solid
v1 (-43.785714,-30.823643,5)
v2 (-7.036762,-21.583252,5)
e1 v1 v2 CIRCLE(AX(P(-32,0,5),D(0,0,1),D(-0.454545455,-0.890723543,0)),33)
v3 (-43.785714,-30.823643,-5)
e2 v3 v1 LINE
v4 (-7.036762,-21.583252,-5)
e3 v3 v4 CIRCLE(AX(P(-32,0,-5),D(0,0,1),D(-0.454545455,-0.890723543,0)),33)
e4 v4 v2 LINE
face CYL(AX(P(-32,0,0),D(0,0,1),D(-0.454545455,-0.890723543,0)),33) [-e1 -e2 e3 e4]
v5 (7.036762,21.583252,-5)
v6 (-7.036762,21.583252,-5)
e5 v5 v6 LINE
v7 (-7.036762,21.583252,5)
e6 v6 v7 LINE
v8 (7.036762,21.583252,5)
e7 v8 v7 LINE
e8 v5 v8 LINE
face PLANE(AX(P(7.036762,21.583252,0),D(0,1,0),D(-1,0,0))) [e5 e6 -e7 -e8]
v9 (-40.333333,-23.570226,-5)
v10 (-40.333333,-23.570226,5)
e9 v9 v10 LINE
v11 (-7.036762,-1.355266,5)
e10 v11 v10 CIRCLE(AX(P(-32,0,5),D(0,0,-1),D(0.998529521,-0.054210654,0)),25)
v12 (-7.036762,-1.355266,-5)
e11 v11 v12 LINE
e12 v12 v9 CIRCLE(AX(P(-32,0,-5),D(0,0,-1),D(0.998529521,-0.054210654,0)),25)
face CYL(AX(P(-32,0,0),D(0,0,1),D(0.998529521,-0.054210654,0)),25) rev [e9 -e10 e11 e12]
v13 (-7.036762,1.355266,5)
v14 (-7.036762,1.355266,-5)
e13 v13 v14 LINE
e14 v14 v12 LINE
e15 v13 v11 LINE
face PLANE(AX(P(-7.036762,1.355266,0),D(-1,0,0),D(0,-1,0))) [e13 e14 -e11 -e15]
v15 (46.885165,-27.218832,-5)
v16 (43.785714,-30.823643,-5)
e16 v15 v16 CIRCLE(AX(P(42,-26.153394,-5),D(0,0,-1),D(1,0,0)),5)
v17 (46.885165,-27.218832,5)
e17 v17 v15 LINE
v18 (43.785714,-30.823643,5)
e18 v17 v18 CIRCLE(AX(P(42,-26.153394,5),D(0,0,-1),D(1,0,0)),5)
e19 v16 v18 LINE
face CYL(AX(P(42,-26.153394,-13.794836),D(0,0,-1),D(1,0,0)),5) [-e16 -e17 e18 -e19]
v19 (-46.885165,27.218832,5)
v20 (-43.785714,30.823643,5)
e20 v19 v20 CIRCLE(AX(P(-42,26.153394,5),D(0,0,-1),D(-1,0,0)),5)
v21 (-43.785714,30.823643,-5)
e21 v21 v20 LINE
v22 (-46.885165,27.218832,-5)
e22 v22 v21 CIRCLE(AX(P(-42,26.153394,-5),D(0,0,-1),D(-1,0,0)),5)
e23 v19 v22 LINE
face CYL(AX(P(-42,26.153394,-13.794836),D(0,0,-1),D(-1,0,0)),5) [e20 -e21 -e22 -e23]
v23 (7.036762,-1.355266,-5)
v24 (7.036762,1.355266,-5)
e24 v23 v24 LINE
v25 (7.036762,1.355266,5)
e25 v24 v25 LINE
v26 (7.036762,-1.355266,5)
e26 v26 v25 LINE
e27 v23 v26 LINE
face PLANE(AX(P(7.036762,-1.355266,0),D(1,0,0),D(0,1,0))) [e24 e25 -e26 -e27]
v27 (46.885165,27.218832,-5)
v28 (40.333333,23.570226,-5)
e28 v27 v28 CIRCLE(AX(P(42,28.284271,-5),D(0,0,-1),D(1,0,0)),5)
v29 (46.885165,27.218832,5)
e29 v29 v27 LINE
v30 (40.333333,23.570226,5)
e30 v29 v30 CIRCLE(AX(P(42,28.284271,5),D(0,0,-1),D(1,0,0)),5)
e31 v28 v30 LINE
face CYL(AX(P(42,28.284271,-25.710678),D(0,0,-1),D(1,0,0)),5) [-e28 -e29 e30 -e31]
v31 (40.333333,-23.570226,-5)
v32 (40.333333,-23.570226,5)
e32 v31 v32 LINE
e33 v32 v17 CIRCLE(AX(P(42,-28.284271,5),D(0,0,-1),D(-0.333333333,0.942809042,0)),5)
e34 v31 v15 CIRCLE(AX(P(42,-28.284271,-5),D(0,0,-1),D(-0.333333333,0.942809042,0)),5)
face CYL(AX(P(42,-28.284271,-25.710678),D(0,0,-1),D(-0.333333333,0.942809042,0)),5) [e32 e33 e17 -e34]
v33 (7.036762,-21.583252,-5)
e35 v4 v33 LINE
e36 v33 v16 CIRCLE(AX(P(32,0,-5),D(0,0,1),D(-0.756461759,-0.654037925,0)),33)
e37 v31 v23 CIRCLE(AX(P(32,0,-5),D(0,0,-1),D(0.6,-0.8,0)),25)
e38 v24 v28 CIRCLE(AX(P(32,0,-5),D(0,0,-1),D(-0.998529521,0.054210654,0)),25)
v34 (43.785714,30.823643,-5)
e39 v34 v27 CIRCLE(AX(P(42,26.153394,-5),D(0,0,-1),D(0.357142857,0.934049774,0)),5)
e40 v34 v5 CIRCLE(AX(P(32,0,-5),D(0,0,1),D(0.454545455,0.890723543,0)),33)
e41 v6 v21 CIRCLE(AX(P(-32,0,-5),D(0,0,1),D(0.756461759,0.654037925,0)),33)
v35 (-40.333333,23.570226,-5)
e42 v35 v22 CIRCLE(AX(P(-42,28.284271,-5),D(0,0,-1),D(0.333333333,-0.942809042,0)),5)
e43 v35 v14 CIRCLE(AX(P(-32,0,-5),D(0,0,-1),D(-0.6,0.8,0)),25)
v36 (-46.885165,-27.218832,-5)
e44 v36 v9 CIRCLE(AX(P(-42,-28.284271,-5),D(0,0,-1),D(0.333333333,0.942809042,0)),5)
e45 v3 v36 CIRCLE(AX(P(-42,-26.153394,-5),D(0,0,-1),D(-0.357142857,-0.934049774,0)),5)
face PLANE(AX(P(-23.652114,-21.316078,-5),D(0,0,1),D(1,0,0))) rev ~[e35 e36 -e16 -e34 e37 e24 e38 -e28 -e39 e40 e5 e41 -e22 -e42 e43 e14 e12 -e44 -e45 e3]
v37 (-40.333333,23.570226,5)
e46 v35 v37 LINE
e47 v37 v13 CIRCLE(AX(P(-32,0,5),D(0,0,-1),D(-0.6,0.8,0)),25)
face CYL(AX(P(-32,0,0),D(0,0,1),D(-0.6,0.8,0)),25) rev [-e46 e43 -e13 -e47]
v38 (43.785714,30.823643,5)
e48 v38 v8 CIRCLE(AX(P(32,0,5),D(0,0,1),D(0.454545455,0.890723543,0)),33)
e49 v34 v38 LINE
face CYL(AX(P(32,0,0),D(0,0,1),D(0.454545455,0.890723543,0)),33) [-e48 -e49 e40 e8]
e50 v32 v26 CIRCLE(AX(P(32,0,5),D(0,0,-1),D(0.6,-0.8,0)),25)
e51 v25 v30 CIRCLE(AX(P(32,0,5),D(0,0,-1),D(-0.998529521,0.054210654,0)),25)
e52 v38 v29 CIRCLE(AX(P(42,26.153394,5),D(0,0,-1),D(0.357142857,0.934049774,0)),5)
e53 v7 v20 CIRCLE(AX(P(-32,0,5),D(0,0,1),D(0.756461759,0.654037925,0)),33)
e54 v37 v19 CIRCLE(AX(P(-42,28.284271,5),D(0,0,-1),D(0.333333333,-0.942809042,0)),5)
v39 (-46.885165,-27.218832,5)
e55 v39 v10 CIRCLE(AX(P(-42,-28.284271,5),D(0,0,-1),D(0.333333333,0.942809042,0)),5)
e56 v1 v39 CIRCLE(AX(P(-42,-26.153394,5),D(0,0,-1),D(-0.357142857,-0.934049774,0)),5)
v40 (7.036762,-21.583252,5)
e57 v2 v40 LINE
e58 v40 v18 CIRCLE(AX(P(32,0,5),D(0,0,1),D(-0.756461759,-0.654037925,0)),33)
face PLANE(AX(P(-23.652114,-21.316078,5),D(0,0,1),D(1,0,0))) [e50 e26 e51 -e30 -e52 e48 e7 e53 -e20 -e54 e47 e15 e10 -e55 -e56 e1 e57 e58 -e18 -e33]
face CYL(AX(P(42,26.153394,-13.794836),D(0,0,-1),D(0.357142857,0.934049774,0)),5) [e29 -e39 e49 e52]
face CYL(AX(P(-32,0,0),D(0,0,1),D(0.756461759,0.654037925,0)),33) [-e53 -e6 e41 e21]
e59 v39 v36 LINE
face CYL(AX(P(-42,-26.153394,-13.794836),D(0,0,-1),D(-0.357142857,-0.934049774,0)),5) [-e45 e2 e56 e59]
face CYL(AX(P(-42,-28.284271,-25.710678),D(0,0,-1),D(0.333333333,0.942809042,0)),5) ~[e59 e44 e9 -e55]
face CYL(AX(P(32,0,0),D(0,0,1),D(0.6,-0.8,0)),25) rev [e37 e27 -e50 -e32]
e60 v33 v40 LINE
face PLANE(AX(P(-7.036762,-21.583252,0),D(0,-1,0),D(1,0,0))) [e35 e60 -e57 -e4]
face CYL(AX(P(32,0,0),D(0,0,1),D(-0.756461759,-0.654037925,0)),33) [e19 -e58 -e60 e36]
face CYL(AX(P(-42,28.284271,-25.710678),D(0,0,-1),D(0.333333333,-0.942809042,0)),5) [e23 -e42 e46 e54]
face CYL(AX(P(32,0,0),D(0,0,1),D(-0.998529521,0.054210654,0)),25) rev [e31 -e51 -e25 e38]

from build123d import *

# Parameters (mm, degrees)
F1_DEPTH      = 5
F1_DEPTH_BACK = 5
F2_T1_DEPTH   = 51.4213562373
F2_T3_DEPTH   = 27.589671948


# Not quite as in the source:
# - a fillet or chamfer that OpenCascade refuses, or shapes differently, is made with other operations: its cross-section is extruded or revolved along the edge and cut away or added


with BuildPart() as f1:
    # F0 (on Top) → F1 (new body, two sides)
    with BuildSketch(Plane.XY) as f1_sk:
        with BuildLine():
            ThreePointArc((-7.0367619663, -1.3552663468), (-21.4300874517, -22.6556162733), (-47, -20))
            Line((-47, -20), (-47, -29.3938769134))
            ThreePointArc((-47, -29.3938769134), (-25.6700714676, -32.3872197753), (-7.0367619663, -21.5832515361))
            Line((-7.0367619663, -21.5832515361), (-7.0367619663, -1.3552663468))
        make_face()
        with BuildLine():
            Line((-7.0367619663, 1.3552663468), (-7.0367619663, -1.3552663468))
            ThreePointArc((-7.0367619663, -1.3552663468), (-7, 0), (-7.0367619663, 1.3552663468))
        make_face()
        with BuildLine():
            ThreePointArc((-7.0367619663, 1.3552663468), (-7, 0), (-7.0367619663, -1.3552663468))
            Line((-7.0367619663, -1.3552663468), (-7.0367619663, -21.5832515361))
            ThreePointArc((-7.0367619663, -21.5832515361), (-2.7270271398, -15.2346007472), (0, -8.0622577483))
            ThreePointArc((0, -8.0622577483), (-1, 0), (0, 8.0622577483))
            ThreePointArc((0, 8.0622577483), (-2.7270271398, 15.2346007472), (-7.0367619663, 21.5832515361))
            Line((-7.0367619663, 21.5832515361), (-7.0367619663, 1.3552663468))
        make_face()
        with BuildLine():
            ThreePointArc((-47, 20), (-21.4300874517, 22.6556162733), (-7.0367619663, 1.3552663468))
            Line((-7.0367619663, 1.3552663468), (-7.0367619663, 21.5832515361))
            ThreePointArc((-7.0367619663, 21.5832515361), (-25.6700714676, 32.3872197753), (-47, 29.3938769134))
            Line((-47, 29.3938769134), (-47, 20))
        make_face()
        with BuildLine():
            ThreePointArc((0, -8.0622577483), (-2.7270271398, -15.2346007472), (-7.0367619663, -21.5832515361))
            Line((-7.0367619663, -21.5832515361), (7.0367619663, -21.5832515361))
            ThreePointArc((7.0367619663, -21.5832515361), (2.7270271398, -15.2346007472), (0, -8.0622577483))
        make_face()
        with BuildLine():
            Line((7.0367619663, 21.5832515361), (-7.0367619663, 21.5832515361))
            ThreePointArc((-7.0367619663, 21.5832515361), (-2.7270271398, 15.2346007472), (0, 8.0622577483))
            ThreePointArc((0, 8.0622577483), (2.7270271398, 15.2346007472), (7.0367619663, 21.5832515361))
        make_face()
        with BuildLine():
            ThreePointArc((0, 8.0622577483), (1, 0), (0, -8.0622577483))
            ThreePointArc((0, -8.0622577483), (2.7270271398, -15.2346007472), (7.0367619663, -21.5832515361))
            Line((7.0367619663, -21.5832515361), (7.0367619663, -1.3552663468))
            ThreePointArc((7.0367619663, -1.3552663468), (7, 0), (7.0367619663, 1.3552663468))
            Line((7.0367619663, 1.3552663468), (7.0367619663, 21.5832515361))
            ThreePointArc((7.0367619663, 21.5832515361), (2.7270271398, 15.2346007472), (0, 8.0622577483))
        make_face()
        with BuildLine():
            Line((7.0367619663, -1.3552663468), (7.0367619663, -21.5832515361))
            ThreePointArc((7.0367619663, -21.5832515361), (25.6700714676, -32.3872197753), (47, -29.3938769134))
            Line((47, -29.3938769134), (47, -20))
            ThreePointArc((47, -20), (21.4300874517, -22.6556162733), (7.0367619663, -1.3552663468))
        make_face()
        with BuildLine():
            ThreePointArc((47, 29.3938769134), (25.6700714676, 32.3872197753), (7.0367619663, 21.5832515361))
            Line((7.0367619663, 21.5832515361), (7.0367619663, 1.3552663468))
            ThreePointArc((7.0367619663, 1.3552663468), (21.4300874517, 22.6556162733), (47, 20))
            Line((47, 20), (47, 29.3938769134))
        make_face()
        with BuildLine():
            ThreePointArc((7.0367619663, 1.3552663468), (7, 0), (7.0367619663, -1.3552663468))
            Line((7.0367619663, -1.3552663468), (7.0367619663, 1.3552663468))
        make_face()
        with BuildLine():
            ThreePointArc((0, 8.0622577483), (-1, 0), (0, -8.0622577483))
            ThreePointArc((0, -8.0622577483), (1, 0), (0, 8.0622577483))
        make_face()
    extrude(amount=F1_DEPTH)
    extrude(f1_sk.sketch, amount=-F1_DEPTH_BACK)

    # F2: fillet of radius 5 on 8 edges, made by hand

    # F2_s2 → F2_t1 (cut)
    with BuildSketch(Plane.XY.offset(-25.7106781187)):
        with BuildLine():
            ThreePointArc((-40.3333333333, 23.5702260396), (-44.8867513459, 24.2017883428), (-47, 28.2842712475))
            Line((-47, 28.2842712475), (-47, 20))
            ThreePointArc((-47, 20), (-43.8024463398, 22.0386537791), (-40.3333333333, 23.5702260396))
        make_face()
        with BuildLine():
            ThreePointArc((-40.3333333333, -23.5702260396), (-44.8867513459, -24.2017883428), (-47, -28.2842712475))
            Line((-47, -28.2842712475), (-47, -20))
            ThreePointArc((-47, -20), (-43.8024463398, -22.0386537791), (-40.3333333333, -23.5702260396))
        make_face()
        with BuildLine():
            ThreePointArc((40.3333333333, -23.5702260396), (44.8867513459, -24.2017883428), (47, -28.2842712475))
            Line((47, -28.2842712475), (47, -20))
            ThreePointArc((47, -20), (43.8024463398, -22.0386537791), (40.3333333333, -23.5702260396))
        make_face()
        with BuildLine():
            ThreePointArc((47, 28.2842712475), (44.8867513459, 24.2017883428), (40.3333333333, 23.5702260396))
            ThreePointArc((40.3333333333, 23.5702260396), (43.8024463398, 22.0386537791), (47, 20))
            Line((47, 20), (47, 28.2842712475))
        make_face()
    extrude(amount=F2_T1_DEPTH, mode=Mode.SUBTRACT)

    # F2_s4 → F2_t3 (cut)
    with BuildSketch(Plane.XY.offset(-13.794835974)):
        with BuildLine():
            ThreePointArc((-43.7857142857, -30.8236425293), (-46.1187723552, -28.9881272088), (-47, -26.1533936612))
            Line((-47, -26.1533936612), (-47, -29.3938769134))
            ThreePointArc((-47, -29.3938769134), (-45.4119230492, -30.1516221806), (-43.7857142857, -30.8236425293))
        make_face()
        with BuildLine():
            ThreePointArc((-47, 26.1533936612), (-46.1187723552, 28.9881272088), (-43.7857142857, 30.8236425293))
            ThreePointArc((-43.7857142857, 30.8236425293), (-45.4119230492, 30.1516221806), (-47, 29.3938769134))
            Line((-47, 29.3938769134), (-47, 26.1533936612))
        make_face()
        with BuildLine():
            ThreePointArc((47, -26.1533936612), (46.1187723552, -28.9881272088), (43.7857142857, -30.8236425293))
            ThreePointArc((43.7857142857, -30.8236425293), (45.4119230492, -30.1516221806), (47, -29.3938769134))
            Line((47, -29.3938769134), (47, -26.1533936612))
        make_face()
        with BuildLine():
            ThreePointArc((43.7857142857, 30.8236425293), (46.1187723552, 28.9881272088), (47, 26.1533936612))
            Line((47, 26.1533936612), (47, 29.3938769134))
            ThreePointArc((47, 29.3938769134), (45.4119230492, 30.1516221806), (43.7857142857, 30.8236425293))
        make_face()
    extrude(amount=F2_T3_DEPTH, mode=Mode.SUBTRACT)


solid = f1.part
